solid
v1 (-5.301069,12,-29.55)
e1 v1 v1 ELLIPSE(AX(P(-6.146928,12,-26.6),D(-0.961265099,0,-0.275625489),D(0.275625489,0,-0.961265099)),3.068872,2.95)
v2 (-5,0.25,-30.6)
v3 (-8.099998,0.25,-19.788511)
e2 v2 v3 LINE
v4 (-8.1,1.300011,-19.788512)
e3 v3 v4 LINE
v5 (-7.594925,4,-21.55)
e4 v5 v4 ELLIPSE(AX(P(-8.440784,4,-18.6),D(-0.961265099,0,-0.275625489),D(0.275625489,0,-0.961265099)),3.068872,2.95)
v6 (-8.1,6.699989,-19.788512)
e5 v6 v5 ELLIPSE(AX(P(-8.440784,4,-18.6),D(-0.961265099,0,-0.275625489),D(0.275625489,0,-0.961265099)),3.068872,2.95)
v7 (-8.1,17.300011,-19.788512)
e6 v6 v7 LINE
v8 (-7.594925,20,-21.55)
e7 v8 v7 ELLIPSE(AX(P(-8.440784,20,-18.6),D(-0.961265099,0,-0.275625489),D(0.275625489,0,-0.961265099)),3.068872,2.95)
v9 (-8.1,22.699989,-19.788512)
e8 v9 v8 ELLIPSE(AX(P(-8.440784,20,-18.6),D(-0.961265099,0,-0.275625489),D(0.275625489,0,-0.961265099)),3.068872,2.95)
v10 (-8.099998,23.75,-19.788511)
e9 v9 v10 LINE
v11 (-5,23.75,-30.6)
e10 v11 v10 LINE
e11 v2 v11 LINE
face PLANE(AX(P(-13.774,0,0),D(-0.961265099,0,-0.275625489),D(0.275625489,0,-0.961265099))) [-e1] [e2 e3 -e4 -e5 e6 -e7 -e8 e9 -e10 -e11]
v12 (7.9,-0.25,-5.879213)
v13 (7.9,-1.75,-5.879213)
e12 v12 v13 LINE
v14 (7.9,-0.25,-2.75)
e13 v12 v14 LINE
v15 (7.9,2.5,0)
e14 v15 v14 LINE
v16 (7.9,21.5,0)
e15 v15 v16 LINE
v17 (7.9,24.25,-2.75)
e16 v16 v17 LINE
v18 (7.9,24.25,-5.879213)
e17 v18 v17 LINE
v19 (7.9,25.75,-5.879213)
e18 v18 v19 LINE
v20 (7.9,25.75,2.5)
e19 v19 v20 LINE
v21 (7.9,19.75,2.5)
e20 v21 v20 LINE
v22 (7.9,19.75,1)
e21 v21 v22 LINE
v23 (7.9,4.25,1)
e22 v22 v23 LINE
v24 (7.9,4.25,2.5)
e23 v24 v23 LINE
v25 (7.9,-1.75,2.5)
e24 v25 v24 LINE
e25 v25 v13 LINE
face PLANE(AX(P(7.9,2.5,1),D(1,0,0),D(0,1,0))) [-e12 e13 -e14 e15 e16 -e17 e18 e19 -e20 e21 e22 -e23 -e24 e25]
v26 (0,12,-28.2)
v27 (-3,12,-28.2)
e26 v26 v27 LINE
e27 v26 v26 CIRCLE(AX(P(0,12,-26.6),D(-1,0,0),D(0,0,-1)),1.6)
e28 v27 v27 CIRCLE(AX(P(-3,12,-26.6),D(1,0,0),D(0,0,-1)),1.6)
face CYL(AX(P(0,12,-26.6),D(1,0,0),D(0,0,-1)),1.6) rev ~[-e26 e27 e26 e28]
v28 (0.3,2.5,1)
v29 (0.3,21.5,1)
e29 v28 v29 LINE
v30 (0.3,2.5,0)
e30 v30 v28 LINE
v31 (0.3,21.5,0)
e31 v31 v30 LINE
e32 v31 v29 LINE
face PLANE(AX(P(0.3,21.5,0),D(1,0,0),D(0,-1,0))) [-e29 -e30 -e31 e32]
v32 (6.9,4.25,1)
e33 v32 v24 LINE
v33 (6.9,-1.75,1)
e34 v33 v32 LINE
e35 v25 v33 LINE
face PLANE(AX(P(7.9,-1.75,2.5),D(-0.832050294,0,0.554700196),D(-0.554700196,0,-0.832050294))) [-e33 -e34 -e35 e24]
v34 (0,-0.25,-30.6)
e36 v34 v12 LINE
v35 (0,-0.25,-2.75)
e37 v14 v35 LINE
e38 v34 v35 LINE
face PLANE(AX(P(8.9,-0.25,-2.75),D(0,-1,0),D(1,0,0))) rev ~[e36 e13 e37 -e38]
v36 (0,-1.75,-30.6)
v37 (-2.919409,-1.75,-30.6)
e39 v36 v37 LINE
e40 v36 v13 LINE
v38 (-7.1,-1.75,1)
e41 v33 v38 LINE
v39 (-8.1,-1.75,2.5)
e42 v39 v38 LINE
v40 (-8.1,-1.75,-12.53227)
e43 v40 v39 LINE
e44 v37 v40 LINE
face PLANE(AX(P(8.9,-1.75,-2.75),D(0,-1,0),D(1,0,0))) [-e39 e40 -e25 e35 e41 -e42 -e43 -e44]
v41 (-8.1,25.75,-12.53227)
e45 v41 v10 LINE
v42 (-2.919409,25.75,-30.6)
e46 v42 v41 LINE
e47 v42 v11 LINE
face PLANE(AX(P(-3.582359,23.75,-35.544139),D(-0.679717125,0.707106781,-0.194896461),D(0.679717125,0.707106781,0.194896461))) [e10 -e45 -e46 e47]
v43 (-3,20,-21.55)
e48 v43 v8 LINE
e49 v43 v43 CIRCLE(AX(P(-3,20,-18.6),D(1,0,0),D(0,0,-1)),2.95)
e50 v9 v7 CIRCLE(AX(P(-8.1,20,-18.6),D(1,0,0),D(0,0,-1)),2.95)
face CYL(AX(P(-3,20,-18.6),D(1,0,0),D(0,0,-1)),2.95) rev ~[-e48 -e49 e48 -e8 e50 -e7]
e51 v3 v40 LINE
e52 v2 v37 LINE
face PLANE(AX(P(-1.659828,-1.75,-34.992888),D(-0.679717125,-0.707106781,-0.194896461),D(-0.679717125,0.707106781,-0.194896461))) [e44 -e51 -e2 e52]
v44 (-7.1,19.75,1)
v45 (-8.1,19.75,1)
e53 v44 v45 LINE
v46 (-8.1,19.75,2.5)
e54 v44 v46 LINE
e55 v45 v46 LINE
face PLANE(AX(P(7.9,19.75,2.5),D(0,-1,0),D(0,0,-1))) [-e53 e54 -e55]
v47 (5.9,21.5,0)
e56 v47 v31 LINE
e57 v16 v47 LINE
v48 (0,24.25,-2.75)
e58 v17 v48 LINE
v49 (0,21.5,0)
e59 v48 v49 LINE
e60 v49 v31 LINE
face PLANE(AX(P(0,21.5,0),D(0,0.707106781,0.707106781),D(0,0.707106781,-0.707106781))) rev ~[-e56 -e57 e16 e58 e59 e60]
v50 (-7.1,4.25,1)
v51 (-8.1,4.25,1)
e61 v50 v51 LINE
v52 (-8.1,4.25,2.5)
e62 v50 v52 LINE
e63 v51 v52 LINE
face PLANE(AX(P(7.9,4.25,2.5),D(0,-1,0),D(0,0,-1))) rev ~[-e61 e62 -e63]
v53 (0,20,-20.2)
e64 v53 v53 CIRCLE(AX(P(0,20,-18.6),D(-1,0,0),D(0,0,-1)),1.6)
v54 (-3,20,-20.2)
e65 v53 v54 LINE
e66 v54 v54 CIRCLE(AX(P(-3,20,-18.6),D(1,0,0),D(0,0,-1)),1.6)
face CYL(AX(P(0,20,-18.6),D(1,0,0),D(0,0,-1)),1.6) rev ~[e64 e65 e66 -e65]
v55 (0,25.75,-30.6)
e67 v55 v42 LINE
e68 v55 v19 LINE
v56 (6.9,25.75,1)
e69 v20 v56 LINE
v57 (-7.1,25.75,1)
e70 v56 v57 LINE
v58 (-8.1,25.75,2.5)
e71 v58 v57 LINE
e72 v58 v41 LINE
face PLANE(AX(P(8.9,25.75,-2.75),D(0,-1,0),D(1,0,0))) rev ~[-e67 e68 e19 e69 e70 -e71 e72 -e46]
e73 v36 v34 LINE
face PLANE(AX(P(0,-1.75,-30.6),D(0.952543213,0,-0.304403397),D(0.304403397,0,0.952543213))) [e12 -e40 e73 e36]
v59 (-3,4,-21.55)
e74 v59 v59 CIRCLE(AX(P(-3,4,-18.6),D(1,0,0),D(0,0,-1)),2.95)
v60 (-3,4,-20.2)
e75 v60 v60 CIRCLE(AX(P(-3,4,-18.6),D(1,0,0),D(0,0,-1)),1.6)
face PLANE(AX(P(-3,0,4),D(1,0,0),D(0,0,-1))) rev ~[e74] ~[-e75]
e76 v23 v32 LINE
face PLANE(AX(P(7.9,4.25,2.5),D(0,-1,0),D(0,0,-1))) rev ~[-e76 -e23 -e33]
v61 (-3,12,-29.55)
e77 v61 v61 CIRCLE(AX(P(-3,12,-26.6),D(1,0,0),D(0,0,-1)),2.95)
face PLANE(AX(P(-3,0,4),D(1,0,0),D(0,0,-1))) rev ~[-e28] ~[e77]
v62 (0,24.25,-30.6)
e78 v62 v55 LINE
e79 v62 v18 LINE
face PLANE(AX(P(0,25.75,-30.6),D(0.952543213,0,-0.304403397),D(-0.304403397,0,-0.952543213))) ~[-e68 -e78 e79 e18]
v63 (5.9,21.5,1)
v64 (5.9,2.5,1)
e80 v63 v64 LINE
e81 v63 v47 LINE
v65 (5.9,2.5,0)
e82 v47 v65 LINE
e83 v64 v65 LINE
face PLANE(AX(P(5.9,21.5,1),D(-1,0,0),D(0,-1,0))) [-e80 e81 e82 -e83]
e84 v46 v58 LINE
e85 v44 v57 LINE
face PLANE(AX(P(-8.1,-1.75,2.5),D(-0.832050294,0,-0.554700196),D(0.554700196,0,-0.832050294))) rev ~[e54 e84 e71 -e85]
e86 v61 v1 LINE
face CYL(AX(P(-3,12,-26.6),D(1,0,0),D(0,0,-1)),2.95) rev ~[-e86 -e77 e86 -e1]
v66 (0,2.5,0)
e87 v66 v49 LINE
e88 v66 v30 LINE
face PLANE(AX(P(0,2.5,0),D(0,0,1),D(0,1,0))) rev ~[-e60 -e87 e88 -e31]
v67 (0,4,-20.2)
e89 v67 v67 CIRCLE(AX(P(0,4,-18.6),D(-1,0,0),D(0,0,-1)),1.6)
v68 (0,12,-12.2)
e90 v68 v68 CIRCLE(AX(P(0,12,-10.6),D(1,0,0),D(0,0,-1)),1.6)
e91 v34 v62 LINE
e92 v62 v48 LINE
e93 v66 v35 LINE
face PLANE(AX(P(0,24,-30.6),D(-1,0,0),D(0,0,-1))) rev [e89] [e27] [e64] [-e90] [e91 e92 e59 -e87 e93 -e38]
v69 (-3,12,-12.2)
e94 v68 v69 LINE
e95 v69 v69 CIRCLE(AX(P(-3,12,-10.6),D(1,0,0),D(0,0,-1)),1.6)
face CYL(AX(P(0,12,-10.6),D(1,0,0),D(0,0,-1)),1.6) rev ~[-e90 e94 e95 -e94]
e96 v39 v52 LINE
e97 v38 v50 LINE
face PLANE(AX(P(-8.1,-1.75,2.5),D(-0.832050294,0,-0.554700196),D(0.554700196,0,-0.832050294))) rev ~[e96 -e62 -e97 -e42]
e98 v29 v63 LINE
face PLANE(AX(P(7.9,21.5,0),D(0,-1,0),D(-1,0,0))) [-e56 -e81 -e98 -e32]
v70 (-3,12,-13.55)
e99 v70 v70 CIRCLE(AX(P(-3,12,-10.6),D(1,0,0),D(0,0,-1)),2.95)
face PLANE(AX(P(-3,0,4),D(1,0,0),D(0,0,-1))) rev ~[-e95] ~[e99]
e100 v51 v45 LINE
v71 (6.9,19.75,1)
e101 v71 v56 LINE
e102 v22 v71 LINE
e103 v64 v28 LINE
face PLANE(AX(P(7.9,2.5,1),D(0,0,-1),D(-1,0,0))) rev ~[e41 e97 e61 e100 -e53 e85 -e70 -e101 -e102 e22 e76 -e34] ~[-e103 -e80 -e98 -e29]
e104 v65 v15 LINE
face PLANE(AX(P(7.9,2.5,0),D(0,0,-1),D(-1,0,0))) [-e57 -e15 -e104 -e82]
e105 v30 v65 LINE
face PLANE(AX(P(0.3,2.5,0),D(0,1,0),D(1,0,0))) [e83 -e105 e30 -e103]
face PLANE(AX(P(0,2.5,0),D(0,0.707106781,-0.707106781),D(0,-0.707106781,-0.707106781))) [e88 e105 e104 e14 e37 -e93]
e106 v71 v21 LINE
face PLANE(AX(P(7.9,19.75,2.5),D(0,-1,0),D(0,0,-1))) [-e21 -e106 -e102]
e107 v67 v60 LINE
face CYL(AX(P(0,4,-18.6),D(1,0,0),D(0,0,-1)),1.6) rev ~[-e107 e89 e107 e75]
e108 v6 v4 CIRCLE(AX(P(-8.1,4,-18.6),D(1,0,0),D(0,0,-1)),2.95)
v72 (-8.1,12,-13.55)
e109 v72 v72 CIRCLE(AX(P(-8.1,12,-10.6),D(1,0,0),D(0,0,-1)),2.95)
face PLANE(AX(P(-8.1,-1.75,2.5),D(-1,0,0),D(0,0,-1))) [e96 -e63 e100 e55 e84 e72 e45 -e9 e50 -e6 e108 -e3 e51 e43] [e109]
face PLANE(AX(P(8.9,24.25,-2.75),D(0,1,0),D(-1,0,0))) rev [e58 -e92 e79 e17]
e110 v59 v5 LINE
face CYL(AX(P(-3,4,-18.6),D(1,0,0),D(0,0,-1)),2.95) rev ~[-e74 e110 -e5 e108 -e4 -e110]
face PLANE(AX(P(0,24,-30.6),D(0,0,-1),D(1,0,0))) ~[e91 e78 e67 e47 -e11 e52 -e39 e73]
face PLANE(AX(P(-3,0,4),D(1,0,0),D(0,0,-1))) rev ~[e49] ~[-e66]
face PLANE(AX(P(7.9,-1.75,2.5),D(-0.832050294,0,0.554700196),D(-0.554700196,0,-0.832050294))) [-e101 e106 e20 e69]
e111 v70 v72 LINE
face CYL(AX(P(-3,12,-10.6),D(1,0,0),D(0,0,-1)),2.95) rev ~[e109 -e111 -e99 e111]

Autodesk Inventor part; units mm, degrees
ref_plane "YZ Plane" through (0, 0, 0) normal (1, 0, 0) x (0, 1, 0)
sketch "Sketch1" plane through (0, 0, 0) normal (0, 1, 0) x (-1, 0, 0)
  line L0 (0, 0) -> (0, -30.6)
  line L1 (0, -30.6) -> (5, -30.6)
  line L2 (0, 0) -> (13.774, 0)
  line L3 (13.774, 0) -> (5, -30.6)
  line L4 (13.774, 0) -> (13.774, 4)
  line L5 (0, 0) -> (0, 9.5471)
  line L6 (13.774, 4) -> (-10.8744, 4)
  point P0 (0, 4)
  dimension "d0" = 30.6
  dimension "d1" = 5
  dimension "d2" = 13.774
  dimension "d3" = 4
extrude "Extrusion1" add sketch "Sketch1" along normal blind 24
sketch "Sketch2" plane through (0, 0, 4) normal (1, 0, 0) x (0, 0, -1)
  line L0 (34.6, 0) -> (34.6, 24) projected
  line L1 (34.6, 12) -> (30.6, 12)
  line L2 (30.6, 12) -> (14.6, 12)
  line L3 (22.6, 12) -> (22.6, 20)
  line L4 (22.6, 12) -> (22.6, 4)
  circle A0 centre (22.6, 20) radius 1.6
  circle A1 centre (14.6, 12) radius 1.6
  circle A2 centre (22.6, 4) radius 1.6
  circle A3 centre (30.6, 12) radius 1.6
  point P0 (4, 0)
  dimension "d6" = 4
  dimension "d7" = 16
  dimension "d8" = 8
  dimension "d9" = 8
  dimension "d10" = 3.2
  dimension "d11" = 3.2
  dimension "d12" = 3.2
  dimension "d13" = 3.2
extrude "Extrusion2" cut sketch "Sketch2" against normal blind 24
ref_plane "Work Plane1" through (-3, 0, 4) normal (1, 0, 0) x (0, 0, -1)
sketch "Sketch3" plane through (-3, 0, 4) normal (1, 0, 0) x (0, 0, -1)
  circle A0 centre (22.6, 20) radius 1.6 projected
  circle A1 centre (22.6, 20) radius 2.95
  circle A2 centre (14.6, 12) radius 1.6 projected
  circle A3 centre (14.6, 12) radius 2.95
  circle A4 centre (22.6, 4) radius 1.6 projected
  circle A5 centre (22.6, 4) radius 2.95
  circle A6 centre (30.6, 12) radius 1.6 projected
  circle A7 centre (30.6, 12) radius 2.95
  point P0 (4, 0)
  dimension "d17" = 5.9
  dimension "d18" = 5.9
  dimension "d19" = 5.9
  dimension "d20" = 5.9
extrude "Extrusion3" cut sketch "Sketch3" against normal blind 24 contours A0 | A1 | A2 | A3 | A4 | A5 | A6 | A7
sketch "Sketch5" plane through (0, 0, 4) normal (1, 0, 0) x (0, 0, -1)
  line L0 (4, 0) -> (0, 0) projected
  line L1 (34.6, 24) -> (4, 24) projected
  line L2 (0, 0) -> (4, 0)
  line L3 (4, 0) -> (4, 24)
  line L4 (4, 24) -> (0, 24)
  line L5 (0, 24) -> (0, 0)
  line L6 (4, 0) -> (4, 24) projected
  line L7 (4, 24) -> (6.5, 24)
  line L8 (6.5, 24) -> (6.5, 21.5)
  line L9 (6.5, 21.5) -> (4, 21.5)
  line L10 (4, 21.5) -> (4, 24)
  line L11 (4, 0) -> (6.5, 0)
  line L12 (6.5, 0) -> (6.5, 2.5)
  line L13 (6.5, 2.5) -> (4, 2.5)
  line L14 (4, 2.5) -> (4, 0)
  line L15 (4, 2.5) -> (6.5, 0)
  line L16 (4, 21.5) -> (6.5, 24)
  dimension "d40" = 4
  dimension "d41" = 24
  dimension "d44" = 2.5
  dimension "d45" = 2.5
  dimension "d46" = 2.5
  dimension "d47" = 2.5
extrude "Extrusion6" add sketch "Sketch5" along normal blind 8.9 contours L0 L5 L4 L3 | L3 L15 L11 | L3 L1 L16
sketch "Sketch7" plane through (0, 2.5, 0) normal (0, 0, -1) x (-1, 0, 0)
  line L0 (0, 0) -> (-8.9, 0) projected
  line L1 (0, 19) -> (-8.9, 19) projected
  line L2 (0, 0) -> (-5.5, 0)
  line L3 (-5.5, 0) -> (-5.5, 19)
  line L4 (-5.5, 19) -> (0, 19)
  line L5 (0, 19) -> (0, 0)
  line L6 (0, 21.5) -> (0, 19) projected
  line L7 (0, 19) -> (-0.3, 19)
  line L8 (-0.3, 19) -> (-0.3, 0)
  line L9 (-0.3, 0) -> (0, 0)
  line L10 (0, 0) -> (0, 19)
  point P0 (0, -2.5)
  dimension "d55" = 5.5
  dimension "d56" = 0.3
extrude "Extrusion8" cut sketch "Sketch7" against normal blind 30 contours L0 L3 L1 L8
sketch "Sketch9" plane through (-13.774, 0, 0) normal (-1, 0, 0) x (0, 0, 1)
  line L0 (-2.5, 24) -> (-30.6, 24) projected
  line L1 (4, 0) -> (-30.6, 0)
  line L2 (-30.6, 0) -> (-30.6, 24)
  line L3 (-30.6, 24) -> (4, 24)
  line L4 (4, 24) -> (4, 0)
  point P0 (0, 0)
extrude "Extrusion10" cut sketch "Sketch9" against normal blind 5.674
sketch "Sketch10" plane through (8.9, 0, 4) normal (1, 0, 0) x (0, 0, -1)
  line L0 (6.5, 24) -> (0, 24) projected
  line L1 (0, 24) -> (0, 24.25)
  line L2 (0, 24.25) -> (8.0681, 24.25)
  line L3 (4, 21.5) -> (6.5, 24) projected
  line L4 (4, 21.5) -> (7.5355, 25.0355)
  line L5 (4, 21.5) -> (9, 21.5) construction
  line L6 (0, 24) -> (0, 0) projected
  line L7 (6.5, 24) -> (0, 24)
  line L8 (4, 21.5) -> (4, 2.5) projected
  line L9 (4, 12) -> (-3.3365, 12)
  line L10 (6.5, 0) -> (0, 0)
  line L11 (0, 0) -> (0, -0.25)
  line L12 (0, -0.25) -> (8.0681, -0.25)
  line L13 (4, 2.5) -> (6.5, 0)
  line L14 (4, 2.5) -> (7.5355, -1.0355)
  line L15 (4, 2.5) -> (9, 2.5) construction
  line L16 (6.5, 0) -> (0, 0)
  point P0 (4, 0)
  point P1 (6.75, -0.25)
  point P2 (6.75, 24.25)
  dimension "d65" = 0.25
  dimension "d66" = 5
  dimension "d67" = 45
extrude "Extrusion11" add sketch "Sketch10" against normal blind 8.9 contours L0 L1 L2 L4 | L10 L14 L12 L11
ref_plane "Work Plane2" through (0, 12, 0) normal (0, -1, 0) x (1, 0, 0)
sketch "Sketch12" plane through (8.9, -0.25, -2.75) normal (0, -1, 0) x (1, 0, 0)
  line L0 (0, 0) -> (0, 2.75) projected
  line L1 (0, 0) -> (-8.9, 0)
  line L2 (-8.9, 0) -> (-8.9, 6.75)
  line L3 (-8.9, 6.75) -> (0, 6.75)
  line L4 (0, 6.75) -> (0, 0)
  point P0 (-8.9, 2.75)
extrude "Extrusion12" add sketch "Sketch12" along normal blind 1.5
sketch "Sketch13" plane through (0, 0, 0) normal (0, -1, 0) x (1, 0, 0)
  line L0 (0, -30.6) -> (-5, -30.6) projected
  line L1 (0, -2.5) -> (0, 4) projected
  line L2 (-5, -30.6) -> (0, -30.6)
  line L3 (0, -30.6) -> (0, 4)
  line L4 (0, 4) -> (-5, 4)
  line L5 (-5, 4) -> (-5, -30.6)
  line L6 (-8.1, -19.7885) -> (-5, -19.7885)
  line L7 (-5, -19.7885) -> (-5, 4)
  line L8 (-5, 4) -> (-8.1, 4)
  line L9 (-8.1, 4) -> (-8.1, -19.7885)
  line L10 (-5, -30.6) -> (-8.1, -19.7885) projected
  line L11 (-5, -30.6) -> (-8.1, -19.7885)
  point P0 (0, 0)
extrude "Extrusion13" add sketch "Sketch13" along normal blind 1.75
sketch "Sketch14" plane through (8.9, -1.75, -2.75) normal (0, -1, 0) x (1, 0, 0)
  line L0 (-8.9, -27.85) -> (-8.9, 0) projected
  line L1 (0, 0) -> (0, 2.75) projected
  line L2 (-8.9, -27.85) -> (0, 0)
  line L3 (-8.9, -27.85) -> (0, -27.85)
  line L4 (0, -27.85) -> (0, 0)
  line L5 (0, 0) -> (-8.9, 0)
  line L6 (-8.9, 0) -> (-8.9, -27.85)
  point P0 (-8.9, 2.75)
  point P1 (-8.9, 0)
extrude "Extrusion14" add sketch "Sketch14" against normal blind 1.5 contours L0 L5 L2
mirror "Mirror1" about plane through (0, 12, 0) normal (0, -1, 0) of "Extrusion12", "Extrusion13", "Extrusion14"
sketch "Sketch15" plane through (8.9, 0, 4) normal (1, 0, 0) x (0, 0, -1)
  line L0 (22.1903, 31.1847) -> (-2.991, 31.1847)
  line L1 (-2.991, 31.1847) -> (-2.991, -5.1617)
  line L2 (-2.991, -5.1617) -> (22.1903, -5.1617)
  line L3 (22.1903, -5.1617) -> (22.1903, 31.1847)
  point P0 (4, 0)
extrude "Extrusion17" cut sketch "Sketch15" against normal blind 1
sketch "Sketch16" plane through (-8.1, -1.75, 4) normal (0, 0, 1) x (1, 0, 0)
  line L0 (23.1984, -4.3461) -> (-2.2485, -4.3461)
  line L1 (-2.2485, -4.3461) -> (-2.2485, 32.2961)
  line L2 (-2.2485, 32.2961) -> (23.1984, 32.2961)
  line L3 (23.1984, 32.2961) -> (23.1984, -4.3461)
  point P0 (8.1, 1.75)
extrude "Extrusion18" cut sketch "Sketch16" against normal blind 3
sketch "Sketch17" plane through (5.5, 2.5, 0) normal (0, 0, -1) x (-1, 0, 0)
  line L0 (5.2, 0) -> (0, 0) projected
  line L1 (-2.4, 19) -> (-2.4, 0) projected
  line L2 (0, 0) -> (-2.4, 0)
  line L3 (-2.4, 0) -> (-2.4, 19)
  line L4 (-2.4, 19) -> (0, 19)
  line L5 (0, 19) -> (0, 0)
  point P0 (5.5, -2.5)
extrude "Extrusion19" cut sketch "Sketch17" against normal blind 3
sketch "Sketch18" plane through (8.9, -1.75, -2.75) normal (0, -1, 0) x (1, 0, 0)
  line L0 (-8.6, 3.75) -> (-1, 3.75) projected
  line L1 (-1, 3.75) -> (-3, 3.75)
  line L2 (-1, 5.75) -> (-1, 3.75)
  line L3 (-1, 3.75) -> (-2, 3.75)
  line L4 (-2, 3.75) -> (-2, 5.25)
  line L5 (-2, 5.25) -> (-1, 5.25)
  line L6 (-1, 5.25) -> (-1, 3.75)
  line L7 (-1, 5.25) -> (-2, 3.75)
  point P0 (-8.9, 2.75)
  point P1 (-2, 3.75)
  dimension "d97" = 1
  dimension "d98" = 1.5
extrude "Extrusion20" add sketch "Sketch18" against normal blind 27.5 contours L7 L2 L0
sketch "Sketch19" plane through (7.9, 2.5, 1) normal (0, 0, -1) x (-1, 0, 0)
  line L0 (7.6, 19) -> (0, 19) projected
  line L1 (7.6, 0) -> (0, 0) projected
  line L2 (0, 19) -> (2, 19)
  line L3 (2, 19) -> (2, 0)
  line L4 (2, 0) -> (0, 0)
  line L5 (0, 0) -> (0, 19)
  point P0 (7.9, -2.5)
  dimension "d101" = 2
extrude "Extrusion21" add sketch "Sketch19" along normal blind 1
sketch "Sketch20" plane through (8.9, -1.75, -2.75) normal (0, -1, 0) x (1, 0, 0)
  line L0 (-1, 5.25) -> (-1, -3.1292) projected
  line L1 (-1, 5.25) -> (-17, 5.25)
  line L2 (-17, 5.25) -> (-17, 0.25)
  line L3 (-17, 5.25) -> (-16, 5.25)
  line L4 (-16, 5.25) -> (-16, 3.75)
  line L5 (-16, 3.75) -> (-17, 3.75)
  line L6 (-17, 3.75) -> (-17, 5.25)
  line L7 (-17, 5.25) -> (-16, 3.75)
  point P0 (-8.9, 2.75)
  dimension "d107" = 16
  dimension "d108" = 5
  dimension "d109" = 1
  dimension "d110" = 1.5
extrude "Extrusion22" add sketch "Sketch20" against normal blind 27.5 contours L7 L5 L2
sketch "Sketch21" plane through (7.9, 0, 4) normal (1, 0, 0) x (0, 0, -1)
  line L0 (1.5, -1.75) -> (1.5, 25.75) projected
  line L1 (1.5, -1.75) -> (1.5, 4.25)
  line L2 (1.5, 25.75) -> (9.8792, 25.75) projected
  line L3 (1.5, 25.75) -> (1.5, 19.75)
  line L4 (1.5, 19.75) -> (3, 19.75)
  line L5 (3, 21.5) -> (3, 2.5) projected
  line L6 (1.5, 19.75) -> (1.5, 4.25)
  line L7 (1.5, 4.25) -> (3, 4.25)
  line L8 (3, 4.25) -> (3, 19.75)
  point P0 (4, 0)
  dimension "d116" = 6
  dimension "d117" = 6
extrude "Extrusion23" cut sketch "Sketch21" against normal blind 60
chamfer "Chamfer9" distance 2 angle 45 2 edges at (-6.55, 25.75, -25.1943) (-6.55, -1.75, -25.1943)
properties part number "finger_v1"
